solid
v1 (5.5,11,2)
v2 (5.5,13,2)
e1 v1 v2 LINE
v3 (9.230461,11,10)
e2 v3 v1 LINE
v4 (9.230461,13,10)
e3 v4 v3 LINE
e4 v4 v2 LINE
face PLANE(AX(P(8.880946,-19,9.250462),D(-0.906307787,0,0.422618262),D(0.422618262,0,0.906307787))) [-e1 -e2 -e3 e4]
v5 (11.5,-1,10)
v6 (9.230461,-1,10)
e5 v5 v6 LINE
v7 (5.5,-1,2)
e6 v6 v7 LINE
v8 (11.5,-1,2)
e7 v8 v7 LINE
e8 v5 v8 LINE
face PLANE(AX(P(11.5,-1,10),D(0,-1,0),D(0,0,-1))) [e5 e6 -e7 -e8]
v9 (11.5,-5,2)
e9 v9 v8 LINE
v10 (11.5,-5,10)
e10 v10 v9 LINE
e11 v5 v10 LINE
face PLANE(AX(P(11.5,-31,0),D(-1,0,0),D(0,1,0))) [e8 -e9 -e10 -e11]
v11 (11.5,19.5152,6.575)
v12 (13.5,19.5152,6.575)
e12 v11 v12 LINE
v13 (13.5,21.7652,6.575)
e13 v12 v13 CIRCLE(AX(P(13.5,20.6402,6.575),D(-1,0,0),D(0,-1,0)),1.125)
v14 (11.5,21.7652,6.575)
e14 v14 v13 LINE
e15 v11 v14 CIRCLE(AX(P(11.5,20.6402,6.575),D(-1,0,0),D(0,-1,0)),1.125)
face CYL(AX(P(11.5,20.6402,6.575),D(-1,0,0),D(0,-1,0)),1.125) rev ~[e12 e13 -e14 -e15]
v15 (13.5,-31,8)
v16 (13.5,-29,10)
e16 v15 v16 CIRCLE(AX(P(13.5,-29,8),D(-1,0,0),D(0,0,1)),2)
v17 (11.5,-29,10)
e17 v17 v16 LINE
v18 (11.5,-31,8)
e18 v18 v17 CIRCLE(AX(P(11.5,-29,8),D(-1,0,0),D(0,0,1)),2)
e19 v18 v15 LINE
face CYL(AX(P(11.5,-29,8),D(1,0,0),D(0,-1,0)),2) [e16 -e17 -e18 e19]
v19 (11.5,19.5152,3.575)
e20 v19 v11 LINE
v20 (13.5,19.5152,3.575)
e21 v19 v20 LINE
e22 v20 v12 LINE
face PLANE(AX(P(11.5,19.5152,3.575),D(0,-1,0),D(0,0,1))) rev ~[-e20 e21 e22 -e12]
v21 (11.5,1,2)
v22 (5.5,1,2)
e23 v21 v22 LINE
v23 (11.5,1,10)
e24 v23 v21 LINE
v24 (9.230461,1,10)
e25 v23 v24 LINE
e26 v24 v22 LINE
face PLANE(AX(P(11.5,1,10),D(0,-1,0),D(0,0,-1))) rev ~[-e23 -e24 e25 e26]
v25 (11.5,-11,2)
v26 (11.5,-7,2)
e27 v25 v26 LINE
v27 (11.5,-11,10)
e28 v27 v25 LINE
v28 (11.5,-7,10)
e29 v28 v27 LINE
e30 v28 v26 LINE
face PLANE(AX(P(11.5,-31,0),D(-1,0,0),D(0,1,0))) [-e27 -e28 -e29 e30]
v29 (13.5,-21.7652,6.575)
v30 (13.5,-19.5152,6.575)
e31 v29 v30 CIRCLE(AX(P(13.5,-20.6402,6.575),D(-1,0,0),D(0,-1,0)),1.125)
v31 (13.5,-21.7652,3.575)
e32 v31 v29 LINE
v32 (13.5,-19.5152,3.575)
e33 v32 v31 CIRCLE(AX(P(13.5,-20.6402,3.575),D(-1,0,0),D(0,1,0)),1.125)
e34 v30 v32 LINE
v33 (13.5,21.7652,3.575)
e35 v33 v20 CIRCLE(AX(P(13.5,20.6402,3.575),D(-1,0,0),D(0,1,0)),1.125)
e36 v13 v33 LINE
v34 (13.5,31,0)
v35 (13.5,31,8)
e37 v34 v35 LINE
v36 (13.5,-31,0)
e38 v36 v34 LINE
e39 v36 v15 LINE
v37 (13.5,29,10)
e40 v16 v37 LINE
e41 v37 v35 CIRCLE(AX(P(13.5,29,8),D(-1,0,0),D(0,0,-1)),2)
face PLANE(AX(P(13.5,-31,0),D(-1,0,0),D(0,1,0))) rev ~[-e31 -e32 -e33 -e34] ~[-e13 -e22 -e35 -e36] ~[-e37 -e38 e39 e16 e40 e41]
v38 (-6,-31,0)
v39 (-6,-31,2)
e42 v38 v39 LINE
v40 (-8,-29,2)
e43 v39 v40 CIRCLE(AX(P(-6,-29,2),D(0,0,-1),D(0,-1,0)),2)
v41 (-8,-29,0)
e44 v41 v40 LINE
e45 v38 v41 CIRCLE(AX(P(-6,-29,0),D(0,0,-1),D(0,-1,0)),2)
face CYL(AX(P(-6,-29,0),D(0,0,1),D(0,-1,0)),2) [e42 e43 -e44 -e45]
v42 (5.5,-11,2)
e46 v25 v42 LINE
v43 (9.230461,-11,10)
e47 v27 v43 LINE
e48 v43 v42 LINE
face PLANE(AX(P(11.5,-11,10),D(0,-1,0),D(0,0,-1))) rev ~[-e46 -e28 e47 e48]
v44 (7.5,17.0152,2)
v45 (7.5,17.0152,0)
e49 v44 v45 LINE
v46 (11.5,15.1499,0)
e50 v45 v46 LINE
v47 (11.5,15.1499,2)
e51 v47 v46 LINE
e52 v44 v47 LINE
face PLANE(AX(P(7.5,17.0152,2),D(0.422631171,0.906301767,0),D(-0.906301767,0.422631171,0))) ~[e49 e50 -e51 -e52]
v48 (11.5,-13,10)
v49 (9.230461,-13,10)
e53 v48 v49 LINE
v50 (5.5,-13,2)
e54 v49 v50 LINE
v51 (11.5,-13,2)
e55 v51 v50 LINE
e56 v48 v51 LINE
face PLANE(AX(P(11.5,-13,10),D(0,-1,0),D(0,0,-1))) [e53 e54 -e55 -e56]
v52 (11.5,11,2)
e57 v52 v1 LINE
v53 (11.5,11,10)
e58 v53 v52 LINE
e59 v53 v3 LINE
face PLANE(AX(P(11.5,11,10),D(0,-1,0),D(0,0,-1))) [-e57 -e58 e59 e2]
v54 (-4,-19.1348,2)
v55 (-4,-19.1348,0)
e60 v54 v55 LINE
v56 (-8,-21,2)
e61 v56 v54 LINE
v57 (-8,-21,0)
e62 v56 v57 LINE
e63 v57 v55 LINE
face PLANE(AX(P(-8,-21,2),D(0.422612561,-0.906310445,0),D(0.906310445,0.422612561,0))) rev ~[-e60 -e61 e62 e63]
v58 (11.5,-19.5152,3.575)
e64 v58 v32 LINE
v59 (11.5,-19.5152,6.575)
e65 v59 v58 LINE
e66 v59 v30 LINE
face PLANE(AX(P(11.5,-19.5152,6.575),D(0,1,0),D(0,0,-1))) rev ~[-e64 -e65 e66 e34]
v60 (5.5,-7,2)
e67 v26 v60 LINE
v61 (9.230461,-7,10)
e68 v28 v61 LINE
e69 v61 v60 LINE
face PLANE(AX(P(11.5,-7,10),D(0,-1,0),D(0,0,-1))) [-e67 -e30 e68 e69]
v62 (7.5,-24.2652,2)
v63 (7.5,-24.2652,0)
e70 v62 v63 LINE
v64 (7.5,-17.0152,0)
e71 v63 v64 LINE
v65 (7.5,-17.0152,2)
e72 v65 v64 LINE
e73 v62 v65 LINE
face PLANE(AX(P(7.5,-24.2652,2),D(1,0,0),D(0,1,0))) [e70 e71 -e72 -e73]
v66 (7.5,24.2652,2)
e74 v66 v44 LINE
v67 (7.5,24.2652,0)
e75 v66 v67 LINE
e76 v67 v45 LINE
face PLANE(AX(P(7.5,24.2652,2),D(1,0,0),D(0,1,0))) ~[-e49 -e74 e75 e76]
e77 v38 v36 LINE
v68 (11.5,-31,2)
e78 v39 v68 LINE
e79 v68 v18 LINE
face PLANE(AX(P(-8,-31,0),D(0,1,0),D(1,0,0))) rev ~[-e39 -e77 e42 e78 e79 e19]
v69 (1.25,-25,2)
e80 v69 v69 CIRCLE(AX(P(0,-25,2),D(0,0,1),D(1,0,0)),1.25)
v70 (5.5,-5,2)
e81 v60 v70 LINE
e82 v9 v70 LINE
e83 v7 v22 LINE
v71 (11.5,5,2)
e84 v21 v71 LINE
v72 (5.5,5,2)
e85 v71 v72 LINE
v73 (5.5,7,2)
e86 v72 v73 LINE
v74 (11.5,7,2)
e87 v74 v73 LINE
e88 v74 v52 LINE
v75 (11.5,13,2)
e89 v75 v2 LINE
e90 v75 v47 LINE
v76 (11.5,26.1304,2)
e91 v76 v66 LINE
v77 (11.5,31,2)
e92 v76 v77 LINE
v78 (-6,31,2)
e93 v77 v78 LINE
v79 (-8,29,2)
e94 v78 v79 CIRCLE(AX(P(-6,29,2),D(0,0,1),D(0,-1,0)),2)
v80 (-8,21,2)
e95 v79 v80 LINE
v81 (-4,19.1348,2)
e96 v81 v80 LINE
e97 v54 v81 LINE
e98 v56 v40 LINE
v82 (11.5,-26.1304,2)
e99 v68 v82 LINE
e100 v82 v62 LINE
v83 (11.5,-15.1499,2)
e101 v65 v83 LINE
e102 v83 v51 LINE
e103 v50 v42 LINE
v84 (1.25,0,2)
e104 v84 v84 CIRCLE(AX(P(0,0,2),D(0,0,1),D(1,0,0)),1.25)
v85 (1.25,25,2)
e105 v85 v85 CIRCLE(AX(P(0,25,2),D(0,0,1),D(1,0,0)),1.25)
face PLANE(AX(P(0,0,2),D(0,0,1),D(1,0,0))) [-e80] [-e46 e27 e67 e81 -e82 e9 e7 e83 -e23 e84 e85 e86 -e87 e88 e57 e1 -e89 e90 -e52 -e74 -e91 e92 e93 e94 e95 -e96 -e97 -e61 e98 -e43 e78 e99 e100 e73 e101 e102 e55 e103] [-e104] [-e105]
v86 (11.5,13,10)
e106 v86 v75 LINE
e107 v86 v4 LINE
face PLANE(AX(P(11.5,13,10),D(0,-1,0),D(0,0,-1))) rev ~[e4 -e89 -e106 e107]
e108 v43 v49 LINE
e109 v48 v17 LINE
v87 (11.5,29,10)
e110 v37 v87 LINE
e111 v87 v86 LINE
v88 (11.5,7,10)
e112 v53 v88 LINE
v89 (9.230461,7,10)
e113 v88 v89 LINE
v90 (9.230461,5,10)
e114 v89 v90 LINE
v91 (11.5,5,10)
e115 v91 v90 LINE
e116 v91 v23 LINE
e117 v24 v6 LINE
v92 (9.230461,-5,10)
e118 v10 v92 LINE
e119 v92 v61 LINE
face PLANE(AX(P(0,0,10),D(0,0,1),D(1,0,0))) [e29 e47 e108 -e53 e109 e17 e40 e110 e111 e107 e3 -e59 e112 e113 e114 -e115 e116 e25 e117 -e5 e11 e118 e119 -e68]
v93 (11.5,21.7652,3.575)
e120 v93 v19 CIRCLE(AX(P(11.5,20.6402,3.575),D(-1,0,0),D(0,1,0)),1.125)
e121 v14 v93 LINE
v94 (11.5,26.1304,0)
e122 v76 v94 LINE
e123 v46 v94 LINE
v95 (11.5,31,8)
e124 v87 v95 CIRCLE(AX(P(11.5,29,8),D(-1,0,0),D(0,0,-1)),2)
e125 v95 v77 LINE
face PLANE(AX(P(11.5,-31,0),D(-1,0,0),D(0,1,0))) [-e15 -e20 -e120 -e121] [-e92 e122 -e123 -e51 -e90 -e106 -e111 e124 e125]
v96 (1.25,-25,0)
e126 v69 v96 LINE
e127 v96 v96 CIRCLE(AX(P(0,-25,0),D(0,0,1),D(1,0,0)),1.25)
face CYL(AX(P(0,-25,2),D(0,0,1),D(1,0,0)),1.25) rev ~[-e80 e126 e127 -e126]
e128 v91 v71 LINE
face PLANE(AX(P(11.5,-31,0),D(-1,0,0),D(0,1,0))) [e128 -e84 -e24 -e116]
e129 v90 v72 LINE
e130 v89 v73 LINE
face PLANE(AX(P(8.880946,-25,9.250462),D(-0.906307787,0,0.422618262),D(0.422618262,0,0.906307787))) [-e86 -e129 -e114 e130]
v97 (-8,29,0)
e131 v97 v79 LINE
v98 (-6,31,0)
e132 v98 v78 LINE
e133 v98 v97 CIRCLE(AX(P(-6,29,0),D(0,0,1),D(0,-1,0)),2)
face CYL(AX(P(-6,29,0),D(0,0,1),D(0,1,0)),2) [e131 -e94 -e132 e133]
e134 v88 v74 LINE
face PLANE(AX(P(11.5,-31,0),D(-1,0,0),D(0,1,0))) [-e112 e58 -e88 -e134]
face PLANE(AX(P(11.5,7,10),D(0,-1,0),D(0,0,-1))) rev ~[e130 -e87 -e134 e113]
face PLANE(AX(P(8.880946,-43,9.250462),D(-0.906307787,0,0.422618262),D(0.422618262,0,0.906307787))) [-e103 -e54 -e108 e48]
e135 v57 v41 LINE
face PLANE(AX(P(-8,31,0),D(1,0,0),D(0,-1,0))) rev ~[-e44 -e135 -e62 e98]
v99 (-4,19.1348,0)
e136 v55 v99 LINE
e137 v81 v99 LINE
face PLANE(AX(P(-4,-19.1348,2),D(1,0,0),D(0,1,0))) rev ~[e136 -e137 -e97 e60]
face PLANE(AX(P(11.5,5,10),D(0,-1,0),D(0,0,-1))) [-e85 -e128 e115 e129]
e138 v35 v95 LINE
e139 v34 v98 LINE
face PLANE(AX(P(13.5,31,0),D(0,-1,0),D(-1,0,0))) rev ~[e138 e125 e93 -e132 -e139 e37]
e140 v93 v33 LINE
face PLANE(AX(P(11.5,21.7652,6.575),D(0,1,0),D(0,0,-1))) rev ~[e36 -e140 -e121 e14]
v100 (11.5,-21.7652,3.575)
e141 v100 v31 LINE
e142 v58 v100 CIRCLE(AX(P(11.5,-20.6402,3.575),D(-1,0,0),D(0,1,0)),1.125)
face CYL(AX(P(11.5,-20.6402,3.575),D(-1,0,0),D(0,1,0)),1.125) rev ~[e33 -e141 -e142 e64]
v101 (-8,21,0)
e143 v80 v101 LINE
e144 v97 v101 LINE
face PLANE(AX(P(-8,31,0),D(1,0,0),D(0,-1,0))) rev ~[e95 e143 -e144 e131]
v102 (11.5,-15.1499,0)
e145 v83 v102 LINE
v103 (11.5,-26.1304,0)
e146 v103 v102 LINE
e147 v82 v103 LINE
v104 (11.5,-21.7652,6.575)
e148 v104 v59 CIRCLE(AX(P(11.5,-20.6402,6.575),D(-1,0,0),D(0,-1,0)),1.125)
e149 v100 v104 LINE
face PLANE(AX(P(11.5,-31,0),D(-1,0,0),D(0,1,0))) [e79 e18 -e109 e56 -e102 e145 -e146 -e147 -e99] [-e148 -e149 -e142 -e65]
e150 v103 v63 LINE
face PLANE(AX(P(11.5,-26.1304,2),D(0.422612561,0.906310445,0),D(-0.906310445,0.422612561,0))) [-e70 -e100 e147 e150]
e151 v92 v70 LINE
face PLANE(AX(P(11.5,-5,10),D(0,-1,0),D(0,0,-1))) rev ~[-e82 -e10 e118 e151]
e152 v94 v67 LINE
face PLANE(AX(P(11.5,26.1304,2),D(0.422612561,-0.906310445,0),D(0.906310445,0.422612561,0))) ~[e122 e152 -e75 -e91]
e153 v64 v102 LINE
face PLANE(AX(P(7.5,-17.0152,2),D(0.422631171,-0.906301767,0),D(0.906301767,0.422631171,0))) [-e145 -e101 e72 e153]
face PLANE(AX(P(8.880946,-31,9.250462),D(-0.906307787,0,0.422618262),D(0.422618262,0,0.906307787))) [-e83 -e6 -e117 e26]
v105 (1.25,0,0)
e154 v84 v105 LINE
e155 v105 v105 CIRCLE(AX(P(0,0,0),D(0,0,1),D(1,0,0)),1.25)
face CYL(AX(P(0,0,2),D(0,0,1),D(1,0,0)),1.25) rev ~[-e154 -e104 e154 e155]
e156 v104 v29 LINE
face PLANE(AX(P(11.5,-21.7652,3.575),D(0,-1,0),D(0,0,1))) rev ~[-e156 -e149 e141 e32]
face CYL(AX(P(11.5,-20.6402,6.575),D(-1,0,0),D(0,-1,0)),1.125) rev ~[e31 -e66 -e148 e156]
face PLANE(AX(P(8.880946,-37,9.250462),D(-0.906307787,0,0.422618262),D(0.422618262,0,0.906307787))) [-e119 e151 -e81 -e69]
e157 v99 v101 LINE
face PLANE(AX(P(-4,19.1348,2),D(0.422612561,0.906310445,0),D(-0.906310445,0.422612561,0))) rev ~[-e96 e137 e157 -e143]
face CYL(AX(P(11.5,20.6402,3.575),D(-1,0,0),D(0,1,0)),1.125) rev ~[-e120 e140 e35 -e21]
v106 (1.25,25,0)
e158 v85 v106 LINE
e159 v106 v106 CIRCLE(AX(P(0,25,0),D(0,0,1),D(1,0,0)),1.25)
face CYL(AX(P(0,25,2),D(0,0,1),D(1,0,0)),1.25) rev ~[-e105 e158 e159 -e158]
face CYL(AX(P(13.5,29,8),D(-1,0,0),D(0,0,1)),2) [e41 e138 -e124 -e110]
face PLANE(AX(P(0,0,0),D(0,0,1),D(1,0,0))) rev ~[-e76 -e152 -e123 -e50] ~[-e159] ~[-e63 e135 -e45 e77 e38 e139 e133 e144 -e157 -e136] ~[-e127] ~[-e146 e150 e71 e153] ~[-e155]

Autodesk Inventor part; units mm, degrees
ref_plane "YZ Plane" through (0, 0, 0) normal (1, 0, 0) x (0, 1, 0)
ref_plane "XZ Plane" through (0, 0, 0) normal (0, 1, 0) x (-1, 0, 0)
ref_plane "XY Plane" through (0, 0, 0) normal (0, 0, 1) x (1, 0, 0)
sketch "Sketch1" plane through (0, 0, 0) normal (0, 0, 1) x (1, 0, 0)
  circle A0 centre (0, -25) radius 1.25 construction
  circle A1 centre (0, 25) radius 1.25 construction
  circle A2 centre (0, 0) radius 1.25 construction
  line L0 (6, 28.3) -> (11, 33.3) construction
  line L1 (11, 33.3) -> (11, 41.3) construction
  line L2 (9, 43.3) -> (-9, 43.3) construction
  line L3 (-11, 41.3) -> (-11, 33.3) construction
  line L4 (-11, 33.3) -> (-6, 28.3) construction
  line L5 (-6, 28.3) -> (-6, -28.3) construction
  line L6 (-6, -28.3) -> (-11, -33.3) construction
  line L7 (-11, -33.3) -> (-11, -41.3) construction
  line L8 (-9, -43.3) -> (9, -43.3) construction
  line L9 (11, -41.3) -> (11, -33.3) construction
  line L10 (11, -33.3) -> (6, -28.3) construction
  line L11 (6, -28.3) -> (6, 28.3) construction
  circle A3 centre (-6, -38.3) radius 1.375 construction
  circle A4 centre (6, -38.3) radius 1.375 construction
  circle A5 centre (6, 38.3) radius 1.375 construction
  circle A6 centre (-6, 38.3) radius 1.375 construction
  line L12 (13.5, 47.5) -> (13.5, -47.5) construction
  line L13 (-8, -31) -> (13.5, -31)
  line L14 (13.5, -31) -> (13.5, 31)
  line L15 (13.5, 31) -> (-8, 31)
  line L16 (-8, 31) -> (-8, -31)
  arc A7 (11, 41.3) -> (9, 43.3) centre (9, 41.3) ccw projected
  arc A8 (-9, 43.3) -> (-11, 41.3) centre (-9, 41.3) ccw projected
  arc A9 (-11, -41.3) -> (-9, -43.3) centre (-9, -41.3) ccw projected
  arc A10 (9, -43.3) -> (11, -41.3) centre (9, -41.3) ccw projected
  point P0 (0, 0)
  dimension "d0" = 6
  dimension "d1" = 6
  dimension "d2" = 8
extrude "Extrusion1" add sketch "Sketch1" along normal blind 10
shell "Shell1" thickness 2 removed faces 4 at (-0.8333, -31, 3.3333) at (-8, 10.3333, 3.3333) at (-0.8333, 10.3333, 10) at (6.3333, 31, 3.3333)
sketch "Sketch2" plane through (11.5, -31, 2) normal (-1, 0, 0) x (0, 0, 1)
  circle A0 centre (3.075, 10.3598) radius 1.25 construction
  circle A1 centre (3.075, 51.6402) radius 1.25 construction
  line L0 (0, 0) -> (0, 62) projected
  line L1 (8, 0) -> (0, 0) projected
  line L2 (8, 62) -> (8, 0) projected
  line L3 (0, 62) -> (8, 62) projected
  line L4 (1.575, 10.3598) -> (4.575, 10.3598) construction
  line L5 (1.575, 9.2348) -> (4.575, 9.2348)
  line L6 (4.575, 11.4848) -> (1.575, 11.4848)
  arc A2 (1.575, 11.4848) -> (1.575, 9.2348) centre (1.575, 10.3598) ccw
  arc A3 (4.575, 9.2348) -> (4.575, 11.4848) centre (4.575, 10.3598) ccw
  line L7 (1.575, 51.6402) -> (4.575, 51.6402) construction
  line L8 (1.575, 50.5152) -> (4.575, 50.5152)
  line L9 (4.575, 52.7652) -> (1.575, 52.7652)
  arc A4 (1.575, 52.7652) -> (1.575, 50.5152) centre (1.575, 51.6402) ccw
  arc A5 (4.575, 50.5152) -> (4.575, 52.7652) centre (4.575, 51.6402) ccw
  line L10 (3.075, 51.6402) -> (6.075, 51.6402) construction
  point P0 (-2, 31)
  dimension "d6" = 1.5
  dimension "d7" = 2.25
  dimension "d8" = 1.5
  dimension "d9" = 0
  dimension "d10" = 2.25
extrude "Extrusion2" cut sketch "Sketch2" against normal through all contours A2 L6 A3 L5 | A4 L9 A5 L8
sketch "Sketch3" plane through (-8, 31, 2) normal (0, 0, 1) x (1, 0, 0)
  circle A0 centre (8, -56) radius 1.25 projected
  circle A1 centre (8, -6) radius 1.25 projected
  circle A2 centre (8, -31) radius 1.25 projected
  line L0 (14, -2.7) -> (19, 2.3) projected
  line L1 (19, 2.3) -> (19, 10.3) projected
  line L2 (17, 12.3) -> (-1, 12.3) projected
  line L3 (-3, 10.3) -> (-3, 2.3) projected
  line L4 (-3, 2.3) -> (2, -2.7) projected
  line L5 (2, -2.7) -> (2, -59.3) projected
  line L6 (2, -59.3) -> (-3, -64.3) projected
  line L7 (-3, -64.3) -> (-3, -72.3) projected
  line L8 (-1, -74.3) -> (17, -74.3) projected
  line L9 (19, -72.3) -> (19, -64.3) projected
  line L10 (19, -64.3) -> (14, -59.3) projected
  line L11 (14, -59.3) -> (14, -2.7) projected
  circle A3 centre (2, -69.3) radius 1.375 projected
  circle A4 centre (14, -69.3) radius 1.375 projected
  circle A5 centre (14, 7.3) radius 1.375 projected
  circle A6 centre (2, 7.3) radius 1.375 projected
  arc A7 (19, 10.3) -> (17, 12.3) centre (17, 10.3) ccw projected
  arc A8 (-1, 12.3) -> (-3, 10.3) centre (-1, 10.3) ccw projected
  arc A9 (-3, -72.3) -> (-1, -74.3) centre (-1, -72.3) ccw projected
  arc A10 (17, -74.3) -> (19, -72.3) centre (17, -72.3) ccw projected
  point P0 (8, -31)
extrude "Extrusion3" cut sketch "Sketch3" against normal through all contours A0 | A1 | A2
sketch "Sketch4" plane through (-8, 31, 2) normal (0, 0, 1) x (1, 0, 0)
  line L0 (19.5, -52.7652) -> (19.5, -50.5152) projected
  line L1 (19.5, -11.4848) -> (19.5, -9.2348) projected
  line L2 (19.5, -62) -> (19.5, 0) construction
  line L3 (19.5, -57.1304) -> (15.5, -55.2652)
  line L4 (15.5, -55.2652) -> (15.5, -48.0152)
  line L5 (15.5, -48.0152) -> (19.5, -46.1499)
  line L6 (19.5, -52.7652) -> (15.5, -52.7652) construction
  line L7 (19.5, -50.5152) -> (15.5, -50.5152) construction
  line L8 (19.5, -57.1304) -> (19.5, -46.1499)
  point P0 (8, -31)
  dimension "d15" = 65
  dimension "d16" = 65
  dimension "d18" = 2.5
  dimension "d19" = 2.5
  dimension "d20" = 4
extrude "Extrusion4" cut sketch "Sketch4" against normal through all
sketch "Sketch5" plane through (-8, 31, 2) normal (0, 0, 1) x (1, 0, 0)
  line L0 (15.5, -48.0152) -> (19.5, -46.1499) projected
  line L1 (19.5, -46.1499) -> (19.5, 0) projected
  line L2 (0, 0) -> (19.5, 0) projected
  line L3 (0, -62) -> (0, 0) projected
  line L4 (19.5, -62) -> (0, -62) projected
  line L5 (19.5, -62) -> (19.5, -57.1304) projected
  line L6 (19.5, -57.1304) -> (15.5, -55.2652) projected
  line L7 (15.5, -55.2652) -> (15.5, -48.0152) projected
  circle A0 centre (8, -6) radius 1.25 projected
  circle A1 centre (8, -31) radius 1.25 projected
  circle A2 centre (8, -56) radius 1.25 projected
  line L8 (0, -52) -> (4, -50.1348)
  line L9 (4, -50.1348) -> (4, -11.8652)
  line L10 (4, -11.8652) -> (0, -10)
  point P0 (8, -31)
  dimension "d25" = 10
  dimension "d26" = 65
  dimension "d27" = 65
  dimension "d28" = 10
  dimension "d29" = 4
extrude "Extrusion5" cut sketch "Sketch5" against normal through all contours L10 L9 L8 L3
mirror "Mirror1" about plane through (0, 0, 0) normal (0, 1, 0) of "Extrusion4"
sketch "Sketch7" plane through (11.5, -31, 10) normal (-1, 0, 0) x (0, 0, 1)
  line L0 (-6.425, 52.7652) -> (-3.425, 52.7652) projected
  arc A0 (-3.425, 50.5152) -> (-3.425, 52.7652) centre (-3.425, 51.6402) ccw projected
  line L1 (-3.425, 50.5152) -> (-6.425, 50.5152) projected
  arc A1 (-6.425, 52.7652) -> (-6.425, 50.5152) centre (-6.425, 51.6402) ccw projected
  line L2 (-6.425, 11.4848) -> (-3.425, 11.4848) projected
  arc A2 (-3.425, 9.2348) -> (-3.425, 11.4848) centre (-3.425, 10.3598) ccw projected
  line L3 (-3.425, 9.2348) -> (-6.425, 9.2348) projected
  arc A3 (-6.425, 11.4848) -> (-6.425, 9.2348) centre (-6.425, 10.3598) ccw projected
  line L4 (-8, 0) -> (-8, 4.8696) projected
  line L5 (0, 0) -> (-8, 0) projected
  line L6 (0, 62) -> (0, 0) projected
  line L7 (-8, 62) -> (0, 62) projected
  line L8 (-8, 57.1304) -> (-8, 62) projected
  line L9 (-8, 57.1304) -> (-10, 57.1304) projected
  line L10 (-10, 46.1499) -> (-10, 57.1304) projected
  line L11 (-8, 46.1499) -> (-10, 46.1499) projected
  line L12 (-8, 15.8501) -> (-8, 46.1499) projected
  line L13 (-8, 15.8501) -> (-10, 15.8501) projected
  line L14 (-10, 4.8696) -> (-10, 15.8501) projected
  line L15 (-8, 4.8696) -> (-10, 4.8696) projected
  line L16 (0, 0) -> (0, 62) projected
  line L17 (0, 31) -> (-8, 31)
  line L18 (0, 32) -> (-8, 32)
  line L19 (0, 30) -> (-8, 30)
  point P0 (-10, 31)
  dimension "d32" = 1
  dimension "d33" = 1
extrude "Extrusion6" add sketch "Sketch7" along normal blind 6 contours L19 L12 L17 L6 | L17 L12 L18 L6
draft "FaceDraft1" angle 25 pull direction (0, 0, 1) faces at (5.5, 0.3333, 4.6667) fixed edges at (5.5, 0, 2)
pattern_linear "Rectangular Pattern1" count 5 spacing 6 along (0, -1, 0) of "Extrusion6", "FaceDraft1" first direction both ways yes
fillet "Fillet1" radius 2 4 edges at (-8, -31, 1) (-8, 31, 1) (12.5, 31, 10) (12.5, -31, 10)
equation "\"d1\" = d0"
equation "\"d7\" = d10"
equation "\"d16\" = d15"
equation "\"d19\" = d18"
equation "\"d27\" = d26"
equation "\"d28\" = d25"
equation "\"d33\" = d32"
properties part number "A-07"
